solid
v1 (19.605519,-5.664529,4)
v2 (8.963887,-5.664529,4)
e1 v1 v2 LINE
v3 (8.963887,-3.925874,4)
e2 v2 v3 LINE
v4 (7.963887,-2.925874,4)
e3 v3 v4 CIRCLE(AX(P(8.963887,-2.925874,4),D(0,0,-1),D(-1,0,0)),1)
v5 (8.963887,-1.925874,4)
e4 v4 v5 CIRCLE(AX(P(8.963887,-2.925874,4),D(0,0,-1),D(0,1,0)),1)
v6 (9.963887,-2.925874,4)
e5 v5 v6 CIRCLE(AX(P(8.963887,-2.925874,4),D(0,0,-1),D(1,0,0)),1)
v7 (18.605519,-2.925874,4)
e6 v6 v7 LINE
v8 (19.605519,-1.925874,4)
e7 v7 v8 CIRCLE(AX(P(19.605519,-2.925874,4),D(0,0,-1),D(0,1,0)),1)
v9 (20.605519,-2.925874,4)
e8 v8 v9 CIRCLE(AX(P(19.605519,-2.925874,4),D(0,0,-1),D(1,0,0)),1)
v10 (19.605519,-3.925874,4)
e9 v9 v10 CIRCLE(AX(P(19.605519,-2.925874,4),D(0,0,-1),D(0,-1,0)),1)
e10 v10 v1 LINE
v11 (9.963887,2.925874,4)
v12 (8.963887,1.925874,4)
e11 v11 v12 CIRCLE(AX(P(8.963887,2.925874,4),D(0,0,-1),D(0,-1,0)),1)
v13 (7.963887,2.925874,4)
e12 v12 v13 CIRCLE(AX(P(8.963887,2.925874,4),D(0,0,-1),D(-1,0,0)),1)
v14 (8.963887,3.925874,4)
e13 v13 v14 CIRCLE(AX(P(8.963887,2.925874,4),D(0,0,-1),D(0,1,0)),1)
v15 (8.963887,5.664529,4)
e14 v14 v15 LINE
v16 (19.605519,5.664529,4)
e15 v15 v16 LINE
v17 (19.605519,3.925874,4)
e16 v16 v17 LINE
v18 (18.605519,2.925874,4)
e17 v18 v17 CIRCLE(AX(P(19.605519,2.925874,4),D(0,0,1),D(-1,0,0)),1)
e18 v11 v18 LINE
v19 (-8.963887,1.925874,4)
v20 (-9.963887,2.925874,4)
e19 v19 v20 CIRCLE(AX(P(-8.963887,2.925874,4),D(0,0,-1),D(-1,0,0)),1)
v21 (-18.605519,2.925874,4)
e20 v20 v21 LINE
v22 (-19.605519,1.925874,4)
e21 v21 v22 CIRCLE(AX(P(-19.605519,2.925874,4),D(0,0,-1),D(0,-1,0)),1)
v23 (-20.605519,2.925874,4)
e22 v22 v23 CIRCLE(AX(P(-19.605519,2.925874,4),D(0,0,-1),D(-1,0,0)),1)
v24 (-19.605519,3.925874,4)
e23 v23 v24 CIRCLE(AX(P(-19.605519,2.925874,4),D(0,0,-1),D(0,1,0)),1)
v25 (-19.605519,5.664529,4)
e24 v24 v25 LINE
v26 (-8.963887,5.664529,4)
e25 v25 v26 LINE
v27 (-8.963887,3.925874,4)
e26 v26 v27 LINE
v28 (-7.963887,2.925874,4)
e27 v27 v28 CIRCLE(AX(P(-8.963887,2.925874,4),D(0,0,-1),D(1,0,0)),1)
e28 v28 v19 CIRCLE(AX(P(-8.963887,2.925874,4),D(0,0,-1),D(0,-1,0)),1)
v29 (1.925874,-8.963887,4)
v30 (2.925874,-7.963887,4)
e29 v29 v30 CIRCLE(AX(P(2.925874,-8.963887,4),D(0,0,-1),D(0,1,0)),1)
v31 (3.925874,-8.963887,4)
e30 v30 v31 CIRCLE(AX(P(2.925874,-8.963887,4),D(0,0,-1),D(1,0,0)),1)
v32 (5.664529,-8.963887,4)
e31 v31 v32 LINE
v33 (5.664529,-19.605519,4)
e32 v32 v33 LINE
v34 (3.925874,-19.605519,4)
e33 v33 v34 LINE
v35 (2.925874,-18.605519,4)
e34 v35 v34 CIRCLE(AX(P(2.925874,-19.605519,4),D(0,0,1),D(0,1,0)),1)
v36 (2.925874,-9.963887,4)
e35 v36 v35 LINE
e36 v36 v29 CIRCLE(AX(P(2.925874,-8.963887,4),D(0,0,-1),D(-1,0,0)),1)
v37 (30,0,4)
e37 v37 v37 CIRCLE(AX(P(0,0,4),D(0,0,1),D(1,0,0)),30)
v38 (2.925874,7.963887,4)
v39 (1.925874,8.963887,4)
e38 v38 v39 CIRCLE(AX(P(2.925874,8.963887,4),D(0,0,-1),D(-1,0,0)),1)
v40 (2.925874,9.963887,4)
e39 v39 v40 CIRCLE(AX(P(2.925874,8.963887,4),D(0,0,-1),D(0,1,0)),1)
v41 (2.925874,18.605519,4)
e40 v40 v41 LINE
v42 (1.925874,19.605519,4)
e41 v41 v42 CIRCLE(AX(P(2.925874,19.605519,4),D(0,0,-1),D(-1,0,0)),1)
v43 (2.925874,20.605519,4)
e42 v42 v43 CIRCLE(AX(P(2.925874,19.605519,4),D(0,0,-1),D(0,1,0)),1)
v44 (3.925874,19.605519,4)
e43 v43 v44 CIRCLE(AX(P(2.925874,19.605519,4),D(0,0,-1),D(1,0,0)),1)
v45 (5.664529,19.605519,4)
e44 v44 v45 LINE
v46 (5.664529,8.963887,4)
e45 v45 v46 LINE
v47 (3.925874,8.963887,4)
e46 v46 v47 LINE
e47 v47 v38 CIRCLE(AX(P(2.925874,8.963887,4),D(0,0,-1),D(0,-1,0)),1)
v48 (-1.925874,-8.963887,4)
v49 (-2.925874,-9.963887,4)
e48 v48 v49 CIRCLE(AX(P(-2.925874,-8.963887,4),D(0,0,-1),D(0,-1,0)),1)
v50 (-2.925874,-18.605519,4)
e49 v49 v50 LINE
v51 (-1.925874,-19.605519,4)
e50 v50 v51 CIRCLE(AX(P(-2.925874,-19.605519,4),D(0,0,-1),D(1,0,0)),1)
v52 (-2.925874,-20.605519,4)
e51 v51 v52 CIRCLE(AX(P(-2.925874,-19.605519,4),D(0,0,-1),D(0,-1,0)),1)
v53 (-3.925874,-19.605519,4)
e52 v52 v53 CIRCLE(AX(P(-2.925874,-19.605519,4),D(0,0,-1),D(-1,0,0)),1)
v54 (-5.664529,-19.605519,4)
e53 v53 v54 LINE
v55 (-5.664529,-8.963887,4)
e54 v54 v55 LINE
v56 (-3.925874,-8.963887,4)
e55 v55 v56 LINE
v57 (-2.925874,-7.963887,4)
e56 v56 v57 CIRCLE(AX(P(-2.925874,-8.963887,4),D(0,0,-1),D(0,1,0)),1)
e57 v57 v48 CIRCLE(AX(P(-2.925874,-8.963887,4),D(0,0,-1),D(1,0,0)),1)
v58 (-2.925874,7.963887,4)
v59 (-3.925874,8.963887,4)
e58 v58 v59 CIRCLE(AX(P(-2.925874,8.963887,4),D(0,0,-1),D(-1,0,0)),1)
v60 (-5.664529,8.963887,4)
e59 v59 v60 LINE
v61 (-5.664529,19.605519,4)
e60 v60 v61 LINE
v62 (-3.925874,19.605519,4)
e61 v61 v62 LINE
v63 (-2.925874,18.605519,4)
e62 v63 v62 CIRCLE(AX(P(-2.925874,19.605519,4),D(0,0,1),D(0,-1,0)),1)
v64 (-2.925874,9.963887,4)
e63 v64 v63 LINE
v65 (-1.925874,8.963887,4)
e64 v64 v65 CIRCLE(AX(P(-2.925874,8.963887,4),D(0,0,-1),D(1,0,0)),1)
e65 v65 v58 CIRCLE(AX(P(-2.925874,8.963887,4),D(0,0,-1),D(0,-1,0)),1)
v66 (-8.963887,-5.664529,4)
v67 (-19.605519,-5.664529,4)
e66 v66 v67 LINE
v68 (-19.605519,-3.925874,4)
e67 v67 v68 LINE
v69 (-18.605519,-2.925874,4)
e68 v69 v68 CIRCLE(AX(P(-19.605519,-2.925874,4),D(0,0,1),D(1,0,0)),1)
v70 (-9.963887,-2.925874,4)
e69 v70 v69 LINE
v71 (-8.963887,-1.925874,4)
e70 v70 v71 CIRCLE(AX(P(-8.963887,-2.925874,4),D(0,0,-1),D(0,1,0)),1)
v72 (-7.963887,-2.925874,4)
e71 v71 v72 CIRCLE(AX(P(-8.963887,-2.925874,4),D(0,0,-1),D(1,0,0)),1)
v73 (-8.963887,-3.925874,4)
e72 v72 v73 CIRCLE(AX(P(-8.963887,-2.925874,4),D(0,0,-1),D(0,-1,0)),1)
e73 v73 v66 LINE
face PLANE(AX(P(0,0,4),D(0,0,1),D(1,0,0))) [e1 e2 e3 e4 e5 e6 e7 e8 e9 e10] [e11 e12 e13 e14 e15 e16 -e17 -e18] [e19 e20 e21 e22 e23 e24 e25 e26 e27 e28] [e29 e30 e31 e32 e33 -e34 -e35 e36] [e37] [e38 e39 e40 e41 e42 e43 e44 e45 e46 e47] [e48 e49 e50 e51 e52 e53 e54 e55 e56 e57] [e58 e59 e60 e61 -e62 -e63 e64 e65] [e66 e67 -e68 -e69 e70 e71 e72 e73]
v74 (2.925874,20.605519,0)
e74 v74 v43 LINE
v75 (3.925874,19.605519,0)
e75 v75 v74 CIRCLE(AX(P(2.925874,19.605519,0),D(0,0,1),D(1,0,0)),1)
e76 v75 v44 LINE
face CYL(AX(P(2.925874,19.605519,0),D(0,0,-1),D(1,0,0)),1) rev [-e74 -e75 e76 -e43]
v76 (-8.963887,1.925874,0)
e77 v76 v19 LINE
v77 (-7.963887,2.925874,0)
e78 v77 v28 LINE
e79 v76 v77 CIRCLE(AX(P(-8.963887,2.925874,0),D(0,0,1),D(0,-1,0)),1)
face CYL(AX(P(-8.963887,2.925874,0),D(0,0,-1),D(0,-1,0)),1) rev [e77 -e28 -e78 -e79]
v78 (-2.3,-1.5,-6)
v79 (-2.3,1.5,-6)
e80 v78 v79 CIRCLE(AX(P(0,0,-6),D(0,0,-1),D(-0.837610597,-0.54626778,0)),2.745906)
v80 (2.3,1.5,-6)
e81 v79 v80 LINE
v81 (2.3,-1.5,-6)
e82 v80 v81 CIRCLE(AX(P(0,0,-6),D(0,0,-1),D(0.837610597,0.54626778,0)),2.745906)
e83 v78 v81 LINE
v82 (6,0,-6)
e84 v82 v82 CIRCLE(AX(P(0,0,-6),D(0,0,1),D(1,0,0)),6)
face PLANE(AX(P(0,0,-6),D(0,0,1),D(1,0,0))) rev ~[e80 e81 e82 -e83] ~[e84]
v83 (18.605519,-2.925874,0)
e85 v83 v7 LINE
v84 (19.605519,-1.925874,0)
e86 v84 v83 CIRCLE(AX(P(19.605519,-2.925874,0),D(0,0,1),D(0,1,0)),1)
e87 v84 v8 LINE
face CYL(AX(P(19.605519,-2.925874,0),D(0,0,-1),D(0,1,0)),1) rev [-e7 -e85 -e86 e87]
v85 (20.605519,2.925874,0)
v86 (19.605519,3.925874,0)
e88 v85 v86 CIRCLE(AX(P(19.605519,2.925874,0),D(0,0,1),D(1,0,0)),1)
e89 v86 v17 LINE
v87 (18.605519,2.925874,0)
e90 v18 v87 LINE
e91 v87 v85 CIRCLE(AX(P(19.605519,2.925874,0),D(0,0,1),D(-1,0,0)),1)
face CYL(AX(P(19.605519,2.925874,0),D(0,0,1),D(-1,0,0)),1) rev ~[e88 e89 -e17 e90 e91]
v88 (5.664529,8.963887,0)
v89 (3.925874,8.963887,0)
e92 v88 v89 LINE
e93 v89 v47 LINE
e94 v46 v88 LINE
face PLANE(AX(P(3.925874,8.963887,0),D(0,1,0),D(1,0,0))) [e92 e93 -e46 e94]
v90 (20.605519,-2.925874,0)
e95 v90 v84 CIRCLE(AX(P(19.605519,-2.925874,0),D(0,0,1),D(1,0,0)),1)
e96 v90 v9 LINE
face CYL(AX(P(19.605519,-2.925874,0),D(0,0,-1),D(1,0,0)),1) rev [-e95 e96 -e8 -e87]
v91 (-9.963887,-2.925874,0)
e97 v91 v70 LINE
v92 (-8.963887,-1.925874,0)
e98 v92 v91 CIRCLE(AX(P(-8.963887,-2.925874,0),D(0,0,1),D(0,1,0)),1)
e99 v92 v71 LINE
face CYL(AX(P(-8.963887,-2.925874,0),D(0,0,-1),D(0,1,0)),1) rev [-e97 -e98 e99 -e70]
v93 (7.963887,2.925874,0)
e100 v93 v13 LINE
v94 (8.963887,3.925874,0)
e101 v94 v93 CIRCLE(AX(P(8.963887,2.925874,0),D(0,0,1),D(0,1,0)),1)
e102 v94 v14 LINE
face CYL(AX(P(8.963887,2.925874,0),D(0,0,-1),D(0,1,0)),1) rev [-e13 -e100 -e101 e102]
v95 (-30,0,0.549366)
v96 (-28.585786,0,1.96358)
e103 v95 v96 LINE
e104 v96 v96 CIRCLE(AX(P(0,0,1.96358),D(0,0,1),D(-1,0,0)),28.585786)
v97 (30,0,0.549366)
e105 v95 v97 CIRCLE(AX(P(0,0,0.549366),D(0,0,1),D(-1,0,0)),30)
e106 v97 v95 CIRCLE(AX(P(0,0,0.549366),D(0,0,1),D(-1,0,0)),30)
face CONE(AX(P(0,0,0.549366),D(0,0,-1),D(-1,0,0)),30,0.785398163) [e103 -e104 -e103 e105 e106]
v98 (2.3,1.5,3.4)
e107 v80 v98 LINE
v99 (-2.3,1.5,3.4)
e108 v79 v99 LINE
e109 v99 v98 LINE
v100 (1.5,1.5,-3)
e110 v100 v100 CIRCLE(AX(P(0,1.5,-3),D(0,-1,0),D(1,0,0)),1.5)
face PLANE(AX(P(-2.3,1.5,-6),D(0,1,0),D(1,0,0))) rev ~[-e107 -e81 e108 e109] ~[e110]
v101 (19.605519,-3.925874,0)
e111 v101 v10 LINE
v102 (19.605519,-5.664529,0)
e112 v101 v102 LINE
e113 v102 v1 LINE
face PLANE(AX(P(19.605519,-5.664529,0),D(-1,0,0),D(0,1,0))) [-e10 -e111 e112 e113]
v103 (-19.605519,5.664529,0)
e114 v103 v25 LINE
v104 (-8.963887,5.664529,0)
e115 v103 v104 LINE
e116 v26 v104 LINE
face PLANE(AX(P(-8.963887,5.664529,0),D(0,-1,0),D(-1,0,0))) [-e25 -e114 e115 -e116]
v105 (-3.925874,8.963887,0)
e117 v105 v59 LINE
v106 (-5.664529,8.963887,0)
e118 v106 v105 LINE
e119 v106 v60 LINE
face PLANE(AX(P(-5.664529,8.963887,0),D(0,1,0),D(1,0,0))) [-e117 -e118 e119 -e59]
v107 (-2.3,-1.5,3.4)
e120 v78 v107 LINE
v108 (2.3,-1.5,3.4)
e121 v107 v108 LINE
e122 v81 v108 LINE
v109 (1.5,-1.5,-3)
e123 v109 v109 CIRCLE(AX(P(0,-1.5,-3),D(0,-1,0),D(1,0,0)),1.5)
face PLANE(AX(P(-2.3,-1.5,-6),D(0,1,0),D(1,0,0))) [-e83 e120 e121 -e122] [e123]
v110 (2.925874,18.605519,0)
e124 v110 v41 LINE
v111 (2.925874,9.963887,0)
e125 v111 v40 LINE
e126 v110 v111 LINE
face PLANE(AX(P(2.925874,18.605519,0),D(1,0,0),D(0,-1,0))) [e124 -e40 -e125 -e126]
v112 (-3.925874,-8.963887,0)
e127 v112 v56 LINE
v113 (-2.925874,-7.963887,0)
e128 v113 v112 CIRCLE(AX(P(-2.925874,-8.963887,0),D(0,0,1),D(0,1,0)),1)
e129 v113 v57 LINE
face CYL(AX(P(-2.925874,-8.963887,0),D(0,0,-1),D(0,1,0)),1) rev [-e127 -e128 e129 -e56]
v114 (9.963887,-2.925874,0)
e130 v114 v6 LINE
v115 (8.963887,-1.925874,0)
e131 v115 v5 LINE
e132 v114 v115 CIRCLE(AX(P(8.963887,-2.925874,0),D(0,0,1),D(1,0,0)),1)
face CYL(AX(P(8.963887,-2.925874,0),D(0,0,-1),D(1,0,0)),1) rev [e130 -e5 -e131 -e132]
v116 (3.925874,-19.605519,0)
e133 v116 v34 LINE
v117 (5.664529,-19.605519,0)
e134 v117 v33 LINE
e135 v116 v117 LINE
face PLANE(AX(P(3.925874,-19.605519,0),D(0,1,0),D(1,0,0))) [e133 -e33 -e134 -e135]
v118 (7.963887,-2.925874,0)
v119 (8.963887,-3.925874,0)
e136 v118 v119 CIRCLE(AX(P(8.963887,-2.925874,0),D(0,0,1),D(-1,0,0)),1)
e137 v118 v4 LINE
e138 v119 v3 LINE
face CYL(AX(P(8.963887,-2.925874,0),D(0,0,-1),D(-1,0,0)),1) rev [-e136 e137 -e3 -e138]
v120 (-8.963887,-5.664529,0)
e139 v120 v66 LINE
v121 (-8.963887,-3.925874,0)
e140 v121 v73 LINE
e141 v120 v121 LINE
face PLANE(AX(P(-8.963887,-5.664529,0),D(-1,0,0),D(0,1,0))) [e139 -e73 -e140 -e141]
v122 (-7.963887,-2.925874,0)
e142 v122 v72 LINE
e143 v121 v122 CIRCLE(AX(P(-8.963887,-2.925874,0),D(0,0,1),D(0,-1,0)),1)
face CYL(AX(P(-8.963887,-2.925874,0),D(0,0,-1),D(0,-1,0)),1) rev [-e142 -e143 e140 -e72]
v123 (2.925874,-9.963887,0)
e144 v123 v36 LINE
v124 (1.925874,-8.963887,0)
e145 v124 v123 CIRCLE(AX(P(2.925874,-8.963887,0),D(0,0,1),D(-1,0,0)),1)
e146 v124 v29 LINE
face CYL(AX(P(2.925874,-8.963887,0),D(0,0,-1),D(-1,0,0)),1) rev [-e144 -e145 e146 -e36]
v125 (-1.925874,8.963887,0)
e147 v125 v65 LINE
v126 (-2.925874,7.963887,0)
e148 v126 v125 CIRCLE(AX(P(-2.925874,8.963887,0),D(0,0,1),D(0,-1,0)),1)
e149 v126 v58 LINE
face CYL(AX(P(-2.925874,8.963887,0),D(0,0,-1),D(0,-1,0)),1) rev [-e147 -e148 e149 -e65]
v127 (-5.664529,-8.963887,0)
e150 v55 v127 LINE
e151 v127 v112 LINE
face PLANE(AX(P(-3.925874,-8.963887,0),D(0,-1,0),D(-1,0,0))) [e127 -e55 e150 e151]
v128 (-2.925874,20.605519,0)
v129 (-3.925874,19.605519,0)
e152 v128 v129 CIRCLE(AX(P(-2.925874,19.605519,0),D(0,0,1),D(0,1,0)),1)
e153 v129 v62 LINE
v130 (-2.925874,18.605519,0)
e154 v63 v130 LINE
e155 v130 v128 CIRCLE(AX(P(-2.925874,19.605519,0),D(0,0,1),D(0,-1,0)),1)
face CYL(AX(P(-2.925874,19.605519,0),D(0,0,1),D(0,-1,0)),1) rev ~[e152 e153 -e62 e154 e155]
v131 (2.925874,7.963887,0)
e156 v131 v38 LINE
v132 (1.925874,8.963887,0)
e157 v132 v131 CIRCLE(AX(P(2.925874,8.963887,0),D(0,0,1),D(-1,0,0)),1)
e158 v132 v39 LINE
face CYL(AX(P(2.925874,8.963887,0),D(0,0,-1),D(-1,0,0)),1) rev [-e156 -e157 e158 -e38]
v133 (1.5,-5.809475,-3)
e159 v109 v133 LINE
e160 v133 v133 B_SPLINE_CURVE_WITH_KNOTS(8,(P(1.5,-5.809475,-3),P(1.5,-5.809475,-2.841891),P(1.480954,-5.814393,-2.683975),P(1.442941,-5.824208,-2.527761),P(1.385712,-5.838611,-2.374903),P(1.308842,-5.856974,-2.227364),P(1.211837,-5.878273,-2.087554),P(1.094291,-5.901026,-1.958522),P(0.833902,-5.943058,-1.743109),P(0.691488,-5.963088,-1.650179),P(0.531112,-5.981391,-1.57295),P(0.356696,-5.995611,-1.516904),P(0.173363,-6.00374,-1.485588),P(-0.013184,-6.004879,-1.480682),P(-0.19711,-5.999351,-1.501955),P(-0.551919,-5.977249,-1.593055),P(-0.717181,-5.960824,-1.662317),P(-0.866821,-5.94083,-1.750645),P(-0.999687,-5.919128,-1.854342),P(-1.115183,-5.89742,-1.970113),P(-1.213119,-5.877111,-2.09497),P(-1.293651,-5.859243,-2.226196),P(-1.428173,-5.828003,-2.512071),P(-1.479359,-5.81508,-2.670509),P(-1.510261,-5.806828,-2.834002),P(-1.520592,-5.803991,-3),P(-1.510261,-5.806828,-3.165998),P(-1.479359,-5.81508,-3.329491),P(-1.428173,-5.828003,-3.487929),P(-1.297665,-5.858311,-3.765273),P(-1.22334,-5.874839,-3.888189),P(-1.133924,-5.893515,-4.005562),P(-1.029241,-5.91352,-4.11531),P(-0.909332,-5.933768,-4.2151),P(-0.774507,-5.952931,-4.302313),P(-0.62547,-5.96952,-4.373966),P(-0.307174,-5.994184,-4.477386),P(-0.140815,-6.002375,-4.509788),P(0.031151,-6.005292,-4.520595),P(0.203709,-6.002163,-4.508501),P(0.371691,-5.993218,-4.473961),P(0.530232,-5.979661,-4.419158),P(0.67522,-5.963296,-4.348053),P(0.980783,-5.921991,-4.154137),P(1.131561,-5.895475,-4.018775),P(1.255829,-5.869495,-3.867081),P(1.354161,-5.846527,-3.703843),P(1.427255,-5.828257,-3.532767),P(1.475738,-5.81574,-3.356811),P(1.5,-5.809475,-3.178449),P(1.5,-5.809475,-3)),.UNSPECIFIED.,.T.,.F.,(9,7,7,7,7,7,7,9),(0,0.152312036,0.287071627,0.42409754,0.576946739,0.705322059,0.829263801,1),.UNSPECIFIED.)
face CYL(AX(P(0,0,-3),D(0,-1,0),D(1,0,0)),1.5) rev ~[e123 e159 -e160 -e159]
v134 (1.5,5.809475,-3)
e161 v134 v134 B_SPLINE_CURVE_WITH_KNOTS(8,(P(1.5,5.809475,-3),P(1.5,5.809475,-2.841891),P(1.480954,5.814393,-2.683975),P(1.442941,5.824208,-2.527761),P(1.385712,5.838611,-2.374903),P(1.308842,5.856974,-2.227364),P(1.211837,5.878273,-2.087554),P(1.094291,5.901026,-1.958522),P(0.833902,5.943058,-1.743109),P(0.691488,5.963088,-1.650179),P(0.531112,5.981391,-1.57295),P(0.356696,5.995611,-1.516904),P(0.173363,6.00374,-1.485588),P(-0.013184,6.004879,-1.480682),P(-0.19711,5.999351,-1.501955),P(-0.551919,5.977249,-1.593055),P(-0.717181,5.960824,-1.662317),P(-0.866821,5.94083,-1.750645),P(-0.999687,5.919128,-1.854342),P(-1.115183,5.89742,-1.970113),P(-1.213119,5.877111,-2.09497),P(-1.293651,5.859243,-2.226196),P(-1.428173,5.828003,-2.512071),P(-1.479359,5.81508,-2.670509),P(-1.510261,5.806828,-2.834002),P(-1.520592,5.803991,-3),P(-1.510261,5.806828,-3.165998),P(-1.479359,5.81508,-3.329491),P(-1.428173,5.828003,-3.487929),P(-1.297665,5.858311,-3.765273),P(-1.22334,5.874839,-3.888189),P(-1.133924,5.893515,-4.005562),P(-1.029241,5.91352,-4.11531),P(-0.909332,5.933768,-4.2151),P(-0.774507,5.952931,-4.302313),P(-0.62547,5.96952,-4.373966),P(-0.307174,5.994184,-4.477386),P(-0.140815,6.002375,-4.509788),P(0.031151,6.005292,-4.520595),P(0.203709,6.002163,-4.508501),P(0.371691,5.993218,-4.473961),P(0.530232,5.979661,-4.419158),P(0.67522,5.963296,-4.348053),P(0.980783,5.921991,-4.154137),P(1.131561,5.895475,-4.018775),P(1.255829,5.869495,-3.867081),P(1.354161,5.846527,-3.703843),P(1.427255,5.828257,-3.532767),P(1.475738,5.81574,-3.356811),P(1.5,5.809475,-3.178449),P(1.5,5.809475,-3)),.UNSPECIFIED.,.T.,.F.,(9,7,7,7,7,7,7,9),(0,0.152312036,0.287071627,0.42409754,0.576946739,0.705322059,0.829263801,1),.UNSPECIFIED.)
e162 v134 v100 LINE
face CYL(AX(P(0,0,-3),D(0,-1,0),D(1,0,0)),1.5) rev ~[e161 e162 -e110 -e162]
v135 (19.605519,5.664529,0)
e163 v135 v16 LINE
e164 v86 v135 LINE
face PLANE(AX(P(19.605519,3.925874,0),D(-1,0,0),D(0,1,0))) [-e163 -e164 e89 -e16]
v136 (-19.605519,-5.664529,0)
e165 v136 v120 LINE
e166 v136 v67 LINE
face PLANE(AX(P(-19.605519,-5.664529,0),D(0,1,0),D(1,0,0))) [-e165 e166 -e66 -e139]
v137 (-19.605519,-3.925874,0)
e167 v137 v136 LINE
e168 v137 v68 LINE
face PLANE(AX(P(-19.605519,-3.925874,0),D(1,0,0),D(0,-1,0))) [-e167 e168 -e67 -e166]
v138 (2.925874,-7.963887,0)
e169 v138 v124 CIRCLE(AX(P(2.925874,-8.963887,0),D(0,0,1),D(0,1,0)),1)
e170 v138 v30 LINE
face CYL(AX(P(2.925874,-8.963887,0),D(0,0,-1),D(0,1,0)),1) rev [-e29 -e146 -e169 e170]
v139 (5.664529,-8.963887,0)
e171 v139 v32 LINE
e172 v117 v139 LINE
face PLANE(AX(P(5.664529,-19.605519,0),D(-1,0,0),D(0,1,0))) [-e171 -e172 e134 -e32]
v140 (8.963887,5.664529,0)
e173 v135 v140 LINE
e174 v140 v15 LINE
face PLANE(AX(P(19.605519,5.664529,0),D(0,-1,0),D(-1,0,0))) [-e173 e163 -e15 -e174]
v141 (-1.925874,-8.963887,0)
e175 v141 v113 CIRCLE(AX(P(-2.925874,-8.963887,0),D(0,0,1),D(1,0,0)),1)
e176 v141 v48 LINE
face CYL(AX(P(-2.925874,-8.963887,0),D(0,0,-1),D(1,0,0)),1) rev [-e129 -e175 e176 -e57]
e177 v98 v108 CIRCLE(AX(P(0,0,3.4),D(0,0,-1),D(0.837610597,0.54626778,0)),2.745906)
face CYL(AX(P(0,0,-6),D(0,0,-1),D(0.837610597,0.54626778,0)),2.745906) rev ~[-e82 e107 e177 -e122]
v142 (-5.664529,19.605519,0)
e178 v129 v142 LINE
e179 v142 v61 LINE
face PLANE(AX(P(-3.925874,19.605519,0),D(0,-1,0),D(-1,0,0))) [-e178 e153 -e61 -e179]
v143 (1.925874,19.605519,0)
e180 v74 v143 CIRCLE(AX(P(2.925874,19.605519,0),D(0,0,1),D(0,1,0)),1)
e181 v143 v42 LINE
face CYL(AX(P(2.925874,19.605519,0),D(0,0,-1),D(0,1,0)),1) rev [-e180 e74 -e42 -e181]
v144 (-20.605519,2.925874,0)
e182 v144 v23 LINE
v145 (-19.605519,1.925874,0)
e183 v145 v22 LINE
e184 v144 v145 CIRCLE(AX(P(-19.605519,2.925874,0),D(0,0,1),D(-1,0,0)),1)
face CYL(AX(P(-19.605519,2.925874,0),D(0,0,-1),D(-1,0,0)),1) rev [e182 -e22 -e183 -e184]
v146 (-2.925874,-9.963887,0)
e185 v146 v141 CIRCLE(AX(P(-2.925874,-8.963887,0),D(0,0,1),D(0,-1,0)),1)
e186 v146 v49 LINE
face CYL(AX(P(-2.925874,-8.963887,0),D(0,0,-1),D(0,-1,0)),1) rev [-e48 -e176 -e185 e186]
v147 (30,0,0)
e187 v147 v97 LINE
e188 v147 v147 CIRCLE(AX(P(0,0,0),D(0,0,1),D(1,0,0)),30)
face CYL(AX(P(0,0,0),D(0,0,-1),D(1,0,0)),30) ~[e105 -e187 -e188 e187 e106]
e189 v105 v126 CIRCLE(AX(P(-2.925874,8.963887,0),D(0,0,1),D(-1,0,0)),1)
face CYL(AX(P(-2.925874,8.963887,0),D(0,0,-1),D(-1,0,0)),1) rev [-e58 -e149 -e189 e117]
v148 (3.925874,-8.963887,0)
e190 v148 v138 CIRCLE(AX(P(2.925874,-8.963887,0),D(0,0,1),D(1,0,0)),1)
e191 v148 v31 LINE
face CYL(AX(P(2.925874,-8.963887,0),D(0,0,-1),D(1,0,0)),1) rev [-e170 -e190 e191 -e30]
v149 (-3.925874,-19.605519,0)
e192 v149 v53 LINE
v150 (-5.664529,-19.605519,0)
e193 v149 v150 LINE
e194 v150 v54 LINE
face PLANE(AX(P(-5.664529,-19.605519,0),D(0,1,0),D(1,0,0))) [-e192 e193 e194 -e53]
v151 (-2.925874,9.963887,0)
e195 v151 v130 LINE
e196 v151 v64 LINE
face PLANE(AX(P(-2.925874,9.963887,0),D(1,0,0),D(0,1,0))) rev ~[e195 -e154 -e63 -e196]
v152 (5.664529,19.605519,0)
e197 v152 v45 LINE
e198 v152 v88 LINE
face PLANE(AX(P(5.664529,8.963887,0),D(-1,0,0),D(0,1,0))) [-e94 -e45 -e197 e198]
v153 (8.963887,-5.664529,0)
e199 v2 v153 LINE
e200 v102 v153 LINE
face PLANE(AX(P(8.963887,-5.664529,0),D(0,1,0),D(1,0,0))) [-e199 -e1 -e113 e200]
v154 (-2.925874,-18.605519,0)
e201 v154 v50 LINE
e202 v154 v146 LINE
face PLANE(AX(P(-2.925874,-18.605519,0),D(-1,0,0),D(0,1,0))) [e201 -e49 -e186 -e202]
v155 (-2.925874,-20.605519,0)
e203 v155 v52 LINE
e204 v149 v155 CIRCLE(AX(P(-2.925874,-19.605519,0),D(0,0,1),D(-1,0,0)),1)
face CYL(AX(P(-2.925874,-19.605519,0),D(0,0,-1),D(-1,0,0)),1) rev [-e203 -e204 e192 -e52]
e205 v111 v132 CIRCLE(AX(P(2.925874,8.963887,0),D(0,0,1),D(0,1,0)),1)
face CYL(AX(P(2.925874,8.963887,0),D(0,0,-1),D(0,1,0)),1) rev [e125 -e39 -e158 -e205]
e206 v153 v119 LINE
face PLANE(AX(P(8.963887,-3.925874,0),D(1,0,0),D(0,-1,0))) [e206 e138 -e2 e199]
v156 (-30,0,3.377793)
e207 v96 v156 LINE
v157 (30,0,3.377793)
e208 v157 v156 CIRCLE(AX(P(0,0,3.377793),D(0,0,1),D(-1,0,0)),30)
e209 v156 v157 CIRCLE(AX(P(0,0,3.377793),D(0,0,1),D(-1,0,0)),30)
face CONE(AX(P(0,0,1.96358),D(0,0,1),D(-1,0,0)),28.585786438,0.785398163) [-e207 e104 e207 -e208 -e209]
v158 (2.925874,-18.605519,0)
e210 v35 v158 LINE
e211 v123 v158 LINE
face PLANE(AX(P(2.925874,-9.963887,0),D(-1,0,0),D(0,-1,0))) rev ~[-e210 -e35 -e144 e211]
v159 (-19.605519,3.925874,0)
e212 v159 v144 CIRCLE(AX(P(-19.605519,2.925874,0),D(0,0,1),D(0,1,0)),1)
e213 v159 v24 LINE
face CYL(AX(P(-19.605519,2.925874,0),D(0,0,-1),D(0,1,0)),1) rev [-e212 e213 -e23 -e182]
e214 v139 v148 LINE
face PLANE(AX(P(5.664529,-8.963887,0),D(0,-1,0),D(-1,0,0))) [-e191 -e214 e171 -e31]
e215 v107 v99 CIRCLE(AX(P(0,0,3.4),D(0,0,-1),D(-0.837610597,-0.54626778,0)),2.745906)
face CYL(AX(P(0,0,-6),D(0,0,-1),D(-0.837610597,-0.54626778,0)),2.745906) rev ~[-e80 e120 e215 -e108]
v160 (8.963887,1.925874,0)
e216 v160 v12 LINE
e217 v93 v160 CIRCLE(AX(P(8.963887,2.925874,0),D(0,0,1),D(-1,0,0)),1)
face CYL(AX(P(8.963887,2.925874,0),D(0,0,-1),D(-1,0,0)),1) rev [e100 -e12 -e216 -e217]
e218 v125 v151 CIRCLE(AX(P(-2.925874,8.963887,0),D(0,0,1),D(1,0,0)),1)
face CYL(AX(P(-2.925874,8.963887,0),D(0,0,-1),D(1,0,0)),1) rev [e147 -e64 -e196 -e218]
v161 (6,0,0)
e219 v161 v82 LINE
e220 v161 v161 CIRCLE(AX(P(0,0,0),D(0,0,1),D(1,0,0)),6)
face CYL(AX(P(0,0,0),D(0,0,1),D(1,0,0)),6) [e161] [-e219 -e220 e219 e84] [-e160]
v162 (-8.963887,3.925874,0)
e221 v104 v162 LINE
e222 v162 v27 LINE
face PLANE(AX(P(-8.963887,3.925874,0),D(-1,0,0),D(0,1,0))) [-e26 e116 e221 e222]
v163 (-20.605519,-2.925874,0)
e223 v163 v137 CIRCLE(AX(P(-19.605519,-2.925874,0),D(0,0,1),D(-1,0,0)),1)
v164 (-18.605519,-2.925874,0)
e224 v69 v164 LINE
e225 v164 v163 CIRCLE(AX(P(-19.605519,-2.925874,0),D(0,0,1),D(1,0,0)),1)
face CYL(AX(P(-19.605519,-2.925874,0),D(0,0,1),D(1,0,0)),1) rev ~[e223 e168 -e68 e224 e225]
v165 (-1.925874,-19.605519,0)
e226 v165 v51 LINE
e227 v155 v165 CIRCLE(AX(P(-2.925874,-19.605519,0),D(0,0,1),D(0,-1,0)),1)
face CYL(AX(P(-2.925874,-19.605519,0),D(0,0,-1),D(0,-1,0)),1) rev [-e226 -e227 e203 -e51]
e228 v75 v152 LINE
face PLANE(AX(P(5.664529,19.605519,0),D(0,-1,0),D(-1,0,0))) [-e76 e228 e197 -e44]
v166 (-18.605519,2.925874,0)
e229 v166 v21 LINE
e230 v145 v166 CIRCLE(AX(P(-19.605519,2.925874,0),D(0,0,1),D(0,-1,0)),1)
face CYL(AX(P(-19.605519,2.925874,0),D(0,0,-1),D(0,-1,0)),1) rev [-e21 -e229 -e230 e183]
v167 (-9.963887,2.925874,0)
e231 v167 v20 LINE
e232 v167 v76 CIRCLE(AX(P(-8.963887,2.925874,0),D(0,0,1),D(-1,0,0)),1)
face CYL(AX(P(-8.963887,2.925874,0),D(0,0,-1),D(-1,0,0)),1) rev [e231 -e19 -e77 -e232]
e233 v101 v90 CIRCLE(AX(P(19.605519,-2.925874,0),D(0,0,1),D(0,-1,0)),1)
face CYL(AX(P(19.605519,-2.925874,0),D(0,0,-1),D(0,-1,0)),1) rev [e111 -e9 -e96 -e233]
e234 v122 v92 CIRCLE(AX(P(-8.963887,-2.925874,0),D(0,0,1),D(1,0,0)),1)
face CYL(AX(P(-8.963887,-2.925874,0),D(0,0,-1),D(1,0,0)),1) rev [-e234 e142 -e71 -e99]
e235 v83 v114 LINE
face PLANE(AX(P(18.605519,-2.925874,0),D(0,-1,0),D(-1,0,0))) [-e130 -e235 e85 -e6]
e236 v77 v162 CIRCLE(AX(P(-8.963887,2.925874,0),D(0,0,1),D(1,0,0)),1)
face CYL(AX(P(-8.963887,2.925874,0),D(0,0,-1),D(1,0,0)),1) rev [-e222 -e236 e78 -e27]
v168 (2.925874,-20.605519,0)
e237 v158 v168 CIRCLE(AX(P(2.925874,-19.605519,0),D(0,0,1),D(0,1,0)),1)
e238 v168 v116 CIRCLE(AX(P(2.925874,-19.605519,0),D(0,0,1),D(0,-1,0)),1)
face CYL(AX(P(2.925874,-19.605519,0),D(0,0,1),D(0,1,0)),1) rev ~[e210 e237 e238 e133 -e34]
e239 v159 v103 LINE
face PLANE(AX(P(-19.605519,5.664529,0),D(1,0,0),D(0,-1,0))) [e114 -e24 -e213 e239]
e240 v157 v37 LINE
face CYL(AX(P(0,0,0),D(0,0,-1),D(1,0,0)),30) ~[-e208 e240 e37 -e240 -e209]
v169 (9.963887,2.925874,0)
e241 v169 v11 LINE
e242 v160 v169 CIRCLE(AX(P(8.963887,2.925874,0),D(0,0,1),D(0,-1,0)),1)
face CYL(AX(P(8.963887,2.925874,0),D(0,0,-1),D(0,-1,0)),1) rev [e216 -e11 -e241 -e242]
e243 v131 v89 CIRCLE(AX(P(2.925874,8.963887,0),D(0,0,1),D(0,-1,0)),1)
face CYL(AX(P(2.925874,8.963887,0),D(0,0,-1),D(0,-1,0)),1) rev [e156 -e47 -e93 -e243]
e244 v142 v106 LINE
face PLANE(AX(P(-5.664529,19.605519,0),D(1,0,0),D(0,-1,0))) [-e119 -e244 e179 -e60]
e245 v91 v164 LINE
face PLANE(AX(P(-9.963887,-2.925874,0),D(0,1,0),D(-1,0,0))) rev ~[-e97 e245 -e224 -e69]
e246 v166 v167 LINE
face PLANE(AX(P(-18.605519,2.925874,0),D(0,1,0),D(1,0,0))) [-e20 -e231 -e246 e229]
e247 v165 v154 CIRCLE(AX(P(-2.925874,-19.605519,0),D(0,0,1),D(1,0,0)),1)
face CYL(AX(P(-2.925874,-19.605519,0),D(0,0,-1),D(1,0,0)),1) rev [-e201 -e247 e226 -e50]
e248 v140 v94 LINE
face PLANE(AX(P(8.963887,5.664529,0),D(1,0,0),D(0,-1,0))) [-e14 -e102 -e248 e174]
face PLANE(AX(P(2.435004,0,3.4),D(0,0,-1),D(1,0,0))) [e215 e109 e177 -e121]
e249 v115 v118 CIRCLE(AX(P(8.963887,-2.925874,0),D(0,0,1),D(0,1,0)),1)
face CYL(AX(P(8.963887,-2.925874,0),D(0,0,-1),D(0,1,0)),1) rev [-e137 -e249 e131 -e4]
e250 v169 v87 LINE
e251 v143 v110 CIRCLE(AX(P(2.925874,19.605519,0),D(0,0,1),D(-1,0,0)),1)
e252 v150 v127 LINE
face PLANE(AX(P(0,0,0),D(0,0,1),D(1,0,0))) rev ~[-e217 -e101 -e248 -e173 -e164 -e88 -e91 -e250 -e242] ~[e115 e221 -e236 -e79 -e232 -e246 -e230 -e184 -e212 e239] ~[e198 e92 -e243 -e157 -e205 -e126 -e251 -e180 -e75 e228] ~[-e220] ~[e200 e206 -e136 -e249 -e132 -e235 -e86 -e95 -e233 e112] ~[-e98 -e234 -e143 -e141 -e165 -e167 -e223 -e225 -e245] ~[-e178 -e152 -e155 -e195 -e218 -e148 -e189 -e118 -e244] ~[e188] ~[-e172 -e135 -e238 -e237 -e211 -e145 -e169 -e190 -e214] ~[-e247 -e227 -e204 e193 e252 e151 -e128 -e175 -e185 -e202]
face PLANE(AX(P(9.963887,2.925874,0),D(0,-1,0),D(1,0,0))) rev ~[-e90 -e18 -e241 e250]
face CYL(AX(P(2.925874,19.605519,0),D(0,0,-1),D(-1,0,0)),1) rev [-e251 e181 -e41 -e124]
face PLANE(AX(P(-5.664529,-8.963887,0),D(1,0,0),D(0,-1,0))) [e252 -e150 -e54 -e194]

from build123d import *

# Parameters (mm, degrees)
F0_R             = 30
F0_R_2           = 6
F1_DEPTH         = 4
F2_DEPTH         = 6
F3_R             = 1.5
F4_DEPTH         = 13
F5_W             = 4.6
F5_H             = 3
F6_DEPTH         = 9.4
F11_DEPTH        = 5
F11_COPIES_COUNT = 4


# Not quite as in the source:
# - a pattern or mirror of a feature is missing from the dataset's text; its kind, count and spacing are read off the source's solid


with BuildPart() as f1:
    # F0 (on Top) → F1 (new body)
    with BuildSketch(Plane.XY):
        Circle(F0_R)
        Circle(F0_R_2, mode=Mode.SUBTRACT)
        Circle(F0_R_2)
    extrude(amount=F1_DEPTH)

    # F0 (on Top) → F2 (join)
    with BuildSketch(Plane.XY):
        Circle(F0_R_2)
    extrude(amount=-F2_DEPTH)

    # F3 (on Front) → F4 (cut, symmetric)
    with BuildSketch(Plane.XZ):
        with Locations((0, -3)):
            Circle(F3_R)
    extrude(amount=F4_DEPTH, both=True, mode=Mode.SUBTRACT)

    # F5 (on face) → F6 (cut)
    with BuildSketch(Plane(origin=(0, 0, -6), x_dir=(1, 0, 0), z_dir=(0, 0, -1))):
        with BuildLine():
            ThreePointArc((2.3, -1.5), (2.7459060435, 0), (2.3, 1.5))
            Line((2.3, 1.5), (2.3, -1.5))
        make_face()
        Rectangle(F5_W, F5_H)
        with BuildLine():
            Line((-2.3, -1.5), (-2.3, 1.5))
            ThreePointArc((-2.3, 1.5), (-2.7459060435, 0), (-2.3, -1.5))
        make_face()
    extrude(amount=-F6_DEPTH, mode=Mode.SUBTRACT)

    # F7 (on Front) → F9 (revolve, cut)
    with BuildSketch(Plane.XZ):
        Polygon((-30, 3.3777931239), (-30, 0.5493659992), (-28.5857864376, 1.9635795616), align=None)
    revolve(axis=Axis((0, 0, -3.6810841411), (0, 0, 1)), mode=Mode.SUBTRACT)

    # F10 (on face) → F11 (cut, symmetric)
    with BuildSketch(Plane.XY):
        with BuildLine():
            Line((5.6645294234, 8.9638868584), (5.6645294234, 19.6055186455))
            Line((5.6645294234, 19.6055186455), (3.9258744954, 19.6055186455))
            ThreePointArc((3.9258744954, 19.6055186455), (3.6329812765, 18.8984118643), (2.9258744954, 18.6055186455))
            Line((2.9258744954, 18.6055186455), (2.9258744954, 9.9638868584))
            ThreePointArc((2.9258744954, 9.9638868584), (3.6329812765, 9.6709936396), (3.9258744954, 8.9638868584))
            Line((3.9258744954, 8.9638868584), (5.6645294234, 8.9638868584))
        make_face()
        with BuildLine():
            Line((-2.9258744954, 9.9638868584), (-2.9258744954, 18.6055186455))
            ThreePointArc((-2.9258744954, 18.6055186455), (-3.6329812765, 18.8984118643), (-3.9258744954, 19.6055186455))
            Line((-3.9258744954, 19.6055186455), (-5.6645294234, 19.6055186455))
            Line((-5.6645294234, 19.6055186455), (-5.6645294234, 8.9638868584))
            Line((-5.6645294234, 8.9638868584), (-3.9258744954, 8.9638868584))
            ThreePointArc((-3.9258744954, 8.9638868584), (-3.6329812765, 9.6709936396), (-2.9258744954, 9.9638868584))
        make_face()
        with BuildLine():
            ThreePointArc((2.9258744954, 18.6055186455), (3.6329812765, 18.8984118643), (3.9258744954, 19.6055186455))
            Line((3.9258744954, 19.6055186455), (2.9258744954, 19.6055186455))
            Line((2.9258744954, 19.6055186455), (2.9258744954, 18.6055186455))
        make_face()
        with BuildLine():
            Line((2.9258744954, 18.6055186455), (2.9258744954, 19.6055186455))
            Line((2.9258744954, 19.6055186455), (1.9258744954, 19.6055186455))
            ThreePointArc((1.9258744954, 19.6055186455), (2.2187677142, 18.8984118643), (2.9258744954, 18.6055186455))
        make_face()
        with BuildLine():
            Line((-2.9258744954, 18.6055186455), (-2.9258744954, 19.6055186455))
            Line((-2.9258744954, 19.6055186455), (-3.9258744954, 19.6055186455))
            ThreePointArc((-3.9258744954, 19.6055186455), (-3.6329812765, 18.8984118643), (-2.9258744954, 18.6055186455))
        make_face()
        with BuildLine():
            Line((2.9258744954, 8.9638868584), (3.9258744954, 8.9638868584))
            ThreePointArc((3.9258744954, 8.9638868584), (3.6329812765, 9.6709936396), (2.9258744954, 9.9638868584))
            Line((2.9258744954, 9.9638868584), (2.9258744954, 8.9638868584))
        make_face()
        with BuildLine():
            ThreePointArc((-2.9258744954, 18.6055186455), (-2.2187677142, 18.8984118643), (-1.9258744954, 19.6055186455))
            Line((-1.9258744954, 19.6055186455), (-2.9258744954, 19.6055186455))
            Line((-2.9258744954, 19.6055186455), (-2.9258744954, 18.6055186455))
        make_face()
        with BuildLine():
            Line((-2.9258744954, 8.9638868584), (-2.9258744954, 9.9638868584))
            ThreePointArc((-2.9258744954, 9.9638868584), (-3.6329812765, 9.6709936396), (-3.9258744954, 8.9638868584))
            Line((-3.9258744954, 8.9638868584), (-2.9258744954, 8.9638868584))
        make_face()
        with BuildLine():
            Line((2.9258744954, 8.9638868584), (2.9258744954, 9.9638868584))
            ThreePointArc((2.9258744954, 9.9638868584), (2.2187677142, 9.6709936396), (1.9258744954, 8.9638868584))
            Line((1.9258744954, 8.9638868584), (2.9258744954, 8.9638868584))
        make_face()
        with BuildLine():
            Line((-2.9258744954, 8.9638868584), (-1.9258744954, 8.9638868584))
            ThreePointArc((-1.9258744954, 8.9638868584), (-2.2187677142, 9.6709936396), (-2.9258744954, 9.9638868584))
            Line((-2.9258744954, 9.9638868584), (-2.9258744954, 8.9638868584))
        make_face()
        with BuildLine():
            Line((2.9258744954, 19.6055186455), (3.9258744954, 19.6055186455))
            ThreePointArc((3.9258744954, 19.6055186455), (3.6329812765, 20.3126254267), (2.9258744954, 20.6055186455))
            Line((2.9258744954, 20.6055186455), (2.9258744954, 19.6055186455))
        make_face()
        with BuildLine():
            Line((1.9258744954, 19.6055186455), (2.9258744954, 19.6055186455))
            Line((2.9258744954, 19.6055186455), (2.9258744954, 20.6055186455))
            ThreePointArc((2.9258744954, 20.6055186455), (2.2187677142, 20.3126254267), (1.9258744954, 19.6055186455))
        make_face()
        with BuildLine():
            Line((-2.9258744954, 19.6055186455), (-1.9258744954, 19.6055186455))
            ThreePointArc((-1.9258744954, 19.6055186455), (-2.2187677142, 20.3126254267), (-2.9258744954, 20.6055186455))
            Line((-2.9258744954, 20.6055186455), (-2.9258744954, 19.6055186455))
        make_face()
        with BuildLine():
            Line((-3.9258744954, 19.6055186455), (-2.9258744954, 19.6055186455))
            Line((-2.9258744954, 19.6055186455), (-2.9258744954, 20.6055186455))
            ThreePointArc((-2.9258744954, 20.6055186455), (-3.6329812765, 20.3126254267), (-3.9258744954, 19.6055186455))
        make_face()
        with BuildLine():
            ThreePointArc((-2.9258744954, 7.9638868584), (-2.2187677142, 8.2567800773), (-1.9258744954, 8.9638868584))
            Line((-1.9258744954, 8.9638868584), (-2.9258744954, 8.9638868584))
            Line((-2.9258744954, 8.9638868584), (-2.9258744954, 7.9638868584))
        make_face()
        with BuildLine():
            Line((2.9258744954, 7.9638868584), (2.9258744954, 8.9638868584))
            Line((2.9258744954, 8.9638868584), (1.9258744954, 8.9638868584))
            ThreePointArc((1.9258744954, 8.9638868584), (2.2187677142, 8.2567800773), (2.9258744954, 7.9638868584))
        make_face()
        with BuildLine():
            ThreePointArc((2.9258744954, 7.9638868584), (3.6329812765, 8.2567800773), (3.9258744954, 8.9638868584))
            Line((3.9258744954, 8.9638868584), (2.9258744954, 8.9638868584))
            Line((2.9258744954, 8.9638868584), (2.9258744954, 7.9638868584))
        make_face()
        with BuildLine():
            Line((-2.9258744954, 7.9638868584), (-2.9258744954, 8.9638868584))
            Line((-2.9258744954, 8.9638868584), (-3.9258744954, 8.9638868584))
            ThreePointArc((-3.9258744954, 8.9638868584), (-3.6329812765, 8.2567800773), (-2.9258744954, 7.9638868584))
        make_face()
    f11 = extrude(amount=F11_DEPTH, both=True, mode=Mode.SUBTRACT)

    # F11_copies: F11 ×4 about axis
    f11_copies_axis = Axis((0, 0, 0), (0, 0, 1))
    for i in range(1, F11_COPIES_COUNT):
        add(f11.rotate(f11_copies_axis, i * 360 / F11_COPIES_COUNT), mode=Mode.SUBTRACT)


solid = f1.part
